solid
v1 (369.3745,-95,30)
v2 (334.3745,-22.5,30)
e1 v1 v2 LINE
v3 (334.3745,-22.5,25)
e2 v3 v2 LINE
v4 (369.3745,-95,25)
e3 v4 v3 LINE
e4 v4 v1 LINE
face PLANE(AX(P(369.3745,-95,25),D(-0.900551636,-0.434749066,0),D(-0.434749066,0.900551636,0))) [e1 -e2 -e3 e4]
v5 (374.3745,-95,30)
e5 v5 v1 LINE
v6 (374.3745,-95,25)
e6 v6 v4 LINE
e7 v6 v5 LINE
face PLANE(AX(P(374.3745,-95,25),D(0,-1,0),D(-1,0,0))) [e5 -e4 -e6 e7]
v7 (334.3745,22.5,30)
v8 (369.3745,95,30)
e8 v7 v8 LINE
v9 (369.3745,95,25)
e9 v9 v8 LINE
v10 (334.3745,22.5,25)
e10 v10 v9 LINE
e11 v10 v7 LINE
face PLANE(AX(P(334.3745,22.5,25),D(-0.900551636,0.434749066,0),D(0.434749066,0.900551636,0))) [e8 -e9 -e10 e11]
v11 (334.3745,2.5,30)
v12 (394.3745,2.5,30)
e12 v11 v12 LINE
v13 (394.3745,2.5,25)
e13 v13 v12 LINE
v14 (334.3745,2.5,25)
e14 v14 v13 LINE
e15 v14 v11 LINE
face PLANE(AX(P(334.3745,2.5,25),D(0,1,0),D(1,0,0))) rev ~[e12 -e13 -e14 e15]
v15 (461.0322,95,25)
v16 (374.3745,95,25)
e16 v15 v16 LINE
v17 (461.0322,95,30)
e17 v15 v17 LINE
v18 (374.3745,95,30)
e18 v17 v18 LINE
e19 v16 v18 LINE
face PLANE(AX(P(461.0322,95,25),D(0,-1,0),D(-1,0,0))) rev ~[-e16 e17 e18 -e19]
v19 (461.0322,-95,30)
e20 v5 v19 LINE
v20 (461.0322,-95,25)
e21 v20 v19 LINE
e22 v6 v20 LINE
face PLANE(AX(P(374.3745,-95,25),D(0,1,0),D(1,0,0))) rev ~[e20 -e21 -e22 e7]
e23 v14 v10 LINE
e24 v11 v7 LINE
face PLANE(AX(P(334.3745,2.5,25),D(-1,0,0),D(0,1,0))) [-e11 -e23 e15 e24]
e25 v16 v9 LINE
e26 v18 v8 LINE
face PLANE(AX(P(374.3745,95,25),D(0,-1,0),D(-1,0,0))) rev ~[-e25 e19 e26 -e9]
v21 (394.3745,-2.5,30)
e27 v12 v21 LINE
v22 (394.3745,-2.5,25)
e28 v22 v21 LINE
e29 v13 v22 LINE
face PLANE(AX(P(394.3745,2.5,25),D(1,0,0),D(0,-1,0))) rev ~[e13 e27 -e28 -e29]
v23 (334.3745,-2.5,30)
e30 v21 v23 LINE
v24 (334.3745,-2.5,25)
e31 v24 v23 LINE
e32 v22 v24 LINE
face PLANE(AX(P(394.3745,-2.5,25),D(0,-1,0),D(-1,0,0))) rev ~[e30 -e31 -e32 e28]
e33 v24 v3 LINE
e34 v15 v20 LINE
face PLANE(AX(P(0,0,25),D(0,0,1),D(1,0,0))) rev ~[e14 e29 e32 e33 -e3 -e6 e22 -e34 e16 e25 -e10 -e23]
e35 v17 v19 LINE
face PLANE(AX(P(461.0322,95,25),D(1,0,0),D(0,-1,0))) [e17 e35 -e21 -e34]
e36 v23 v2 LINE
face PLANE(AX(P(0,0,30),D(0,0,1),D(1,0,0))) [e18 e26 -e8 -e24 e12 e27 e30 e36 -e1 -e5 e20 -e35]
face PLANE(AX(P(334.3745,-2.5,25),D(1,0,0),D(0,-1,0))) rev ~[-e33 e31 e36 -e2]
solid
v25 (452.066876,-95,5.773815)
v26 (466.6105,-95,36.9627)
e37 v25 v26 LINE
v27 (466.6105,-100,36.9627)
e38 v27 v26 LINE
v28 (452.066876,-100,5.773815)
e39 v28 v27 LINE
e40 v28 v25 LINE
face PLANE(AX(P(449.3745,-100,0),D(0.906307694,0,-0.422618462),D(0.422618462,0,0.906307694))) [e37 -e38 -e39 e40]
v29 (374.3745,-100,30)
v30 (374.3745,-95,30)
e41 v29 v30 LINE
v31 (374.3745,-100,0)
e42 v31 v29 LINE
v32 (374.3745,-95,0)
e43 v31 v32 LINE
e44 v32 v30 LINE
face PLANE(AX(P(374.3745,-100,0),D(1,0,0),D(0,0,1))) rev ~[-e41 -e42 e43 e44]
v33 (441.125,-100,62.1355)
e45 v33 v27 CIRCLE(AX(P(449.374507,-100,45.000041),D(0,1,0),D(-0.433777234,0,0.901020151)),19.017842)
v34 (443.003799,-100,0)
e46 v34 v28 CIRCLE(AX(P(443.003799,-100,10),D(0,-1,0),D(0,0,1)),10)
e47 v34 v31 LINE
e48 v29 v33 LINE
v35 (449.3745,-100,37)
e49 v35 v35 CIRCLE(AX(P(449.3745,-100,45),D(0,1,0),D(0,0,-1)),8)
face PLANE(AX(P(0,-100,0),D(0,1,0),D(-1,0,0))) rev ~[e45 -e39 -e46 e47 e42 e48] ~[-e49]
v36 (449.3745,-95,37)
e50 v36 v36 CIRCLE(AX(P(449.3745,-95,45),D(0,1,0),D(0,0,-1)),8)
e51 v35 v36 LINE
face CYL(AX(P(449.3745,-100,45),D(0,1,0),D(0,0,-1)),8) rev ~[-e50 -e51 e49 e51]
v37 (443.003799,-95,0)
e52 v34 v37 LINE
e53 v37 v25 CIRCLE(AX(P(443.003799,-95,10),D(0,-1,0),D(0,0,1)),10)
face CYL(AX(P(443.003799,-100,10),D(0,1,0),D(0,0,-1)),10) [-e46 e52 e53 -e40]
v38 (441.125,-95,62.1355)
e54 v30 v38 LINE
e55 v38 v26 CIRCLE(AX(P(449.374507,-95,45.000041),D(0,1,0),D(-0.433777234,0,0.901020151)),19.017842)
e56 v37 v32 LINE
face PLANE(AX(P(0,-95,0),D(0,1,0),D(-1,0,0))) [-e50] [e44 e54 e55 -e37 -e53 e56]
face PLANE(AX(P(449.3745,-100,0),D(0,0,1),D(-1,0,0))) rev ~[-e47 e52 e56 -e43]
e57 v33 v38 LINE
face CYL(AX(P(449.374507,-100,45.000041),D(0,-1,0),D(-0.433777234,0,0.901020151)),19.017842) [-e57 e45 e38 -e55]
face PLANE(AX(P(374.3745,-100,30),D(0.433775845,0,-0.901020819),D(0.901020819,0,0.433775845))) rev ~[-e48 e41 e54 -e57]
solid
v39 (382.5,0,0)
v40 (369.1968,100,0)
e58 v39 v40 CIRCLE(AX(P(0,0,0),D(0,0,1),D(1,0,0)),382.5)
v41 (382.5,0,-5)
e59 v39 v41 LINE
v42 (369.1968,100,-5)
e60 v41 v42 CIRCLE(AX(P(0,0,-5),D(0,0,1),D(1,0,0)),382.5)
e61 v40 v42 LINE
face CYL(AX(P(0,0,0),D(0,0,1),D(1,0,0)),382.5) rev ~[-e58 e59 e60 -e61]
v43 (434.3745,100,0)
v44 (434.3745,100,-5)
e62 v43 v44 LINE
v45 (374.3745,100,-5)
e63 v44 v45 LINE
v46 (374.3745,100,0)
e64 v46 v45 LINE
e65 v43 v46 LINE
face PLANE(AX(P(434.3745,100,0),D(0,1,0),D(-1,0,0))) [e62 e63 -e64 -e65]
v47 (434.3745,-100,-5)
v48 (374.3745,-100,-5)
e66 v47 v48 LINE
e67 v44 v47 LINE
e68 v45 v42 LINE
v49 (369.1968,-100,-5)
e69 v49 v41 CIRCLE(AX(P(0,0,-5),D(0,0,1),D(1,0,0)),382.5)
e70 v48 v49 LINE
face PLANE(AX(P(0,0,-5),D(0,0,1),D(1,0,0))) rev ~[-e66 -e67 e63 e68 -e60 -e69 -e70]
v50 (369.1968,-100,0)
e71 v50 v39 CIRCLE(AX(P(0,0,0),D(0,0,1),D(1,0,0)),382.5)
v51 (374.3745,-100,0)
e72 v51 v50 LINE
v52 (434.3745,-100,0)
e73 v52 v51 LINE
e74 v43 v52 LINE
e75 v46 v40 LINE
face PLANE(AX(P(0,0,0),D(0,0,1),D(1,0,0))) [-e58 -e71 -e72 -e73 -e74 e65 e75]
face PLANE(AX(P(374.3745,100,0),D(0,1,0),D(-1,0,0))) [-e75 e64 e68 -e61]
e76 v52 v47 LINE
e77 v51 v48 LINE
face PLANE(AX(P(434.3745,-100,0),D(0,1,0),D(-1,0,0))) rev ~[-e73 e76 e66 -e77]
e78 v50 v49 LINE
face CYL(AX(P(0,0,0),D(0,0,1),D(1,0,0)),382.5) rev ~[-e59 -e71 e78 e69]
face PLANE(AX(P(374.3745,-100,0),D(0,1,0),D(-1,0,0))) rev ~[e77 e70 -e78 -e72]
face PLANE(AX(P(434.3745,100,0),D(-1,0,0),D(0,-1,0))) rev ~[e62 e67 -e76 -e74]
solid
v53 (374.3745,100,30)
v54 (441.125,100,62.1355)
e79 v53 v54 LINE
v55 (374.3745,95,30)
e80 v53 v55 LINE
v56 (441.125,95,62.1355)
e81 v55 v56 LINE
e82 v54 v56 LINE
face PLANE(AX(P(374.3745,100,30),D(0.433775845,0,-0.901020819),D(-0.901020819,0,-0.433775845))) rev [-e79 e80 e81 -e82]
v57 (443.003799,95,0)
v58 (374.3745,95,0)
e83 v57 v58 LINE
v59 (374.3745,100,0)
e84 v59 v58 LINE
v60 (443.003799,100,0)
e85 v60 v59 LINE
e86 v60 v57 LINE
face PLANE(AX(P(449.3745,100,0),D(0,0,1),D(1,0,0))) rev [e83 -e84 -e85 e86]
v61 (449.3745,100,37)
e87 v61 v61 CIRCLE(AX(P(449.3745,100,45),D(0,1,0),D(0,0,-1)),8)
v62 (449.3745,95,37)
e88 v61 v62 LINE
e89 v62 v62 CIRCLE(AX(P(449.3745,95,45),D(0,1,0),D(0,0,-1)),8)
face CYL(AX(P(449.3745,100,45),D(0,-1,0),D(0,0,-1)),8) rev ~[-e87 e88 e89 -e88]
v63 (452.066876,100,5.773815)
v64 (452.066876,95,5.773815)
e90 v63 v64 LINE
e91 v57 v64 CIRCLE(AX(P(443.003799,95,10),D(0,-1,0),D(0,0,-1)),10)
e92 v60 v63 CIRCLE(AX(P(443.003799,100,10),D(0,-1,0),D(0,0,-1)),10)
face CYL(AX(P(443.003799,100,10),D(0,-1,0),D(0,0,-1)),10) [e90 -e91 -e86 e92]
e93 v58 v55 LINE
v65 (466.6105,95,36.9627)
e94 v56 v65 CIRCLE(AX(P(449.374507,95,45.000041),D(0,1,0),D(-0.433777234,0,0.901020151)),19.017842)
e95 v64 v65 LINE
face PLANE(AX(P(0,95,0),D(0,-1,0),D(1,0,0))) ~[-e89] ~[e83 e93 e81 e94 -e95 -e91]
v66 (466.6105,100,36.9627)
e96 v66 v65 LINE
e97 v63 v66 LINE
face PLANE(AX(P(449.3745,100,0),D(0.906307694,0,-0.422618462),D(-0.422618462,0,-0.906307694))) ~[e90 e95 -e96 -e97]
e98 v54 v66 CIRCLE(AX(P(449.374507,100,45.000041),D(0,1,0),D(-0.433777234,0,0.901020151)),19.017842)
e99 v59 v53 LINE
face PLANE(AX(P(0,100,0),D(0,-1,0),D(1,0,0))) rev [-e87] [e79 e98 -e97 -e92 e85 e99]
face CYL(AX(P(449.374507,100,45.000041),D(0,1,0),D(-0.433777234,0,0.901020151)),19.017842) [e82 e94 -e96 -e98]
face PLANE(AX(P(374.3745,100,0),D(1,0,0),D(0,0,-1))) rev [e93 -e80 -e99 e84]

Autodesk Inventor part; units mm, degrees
ref_plane "YZ Plane" through (0, 0, 0) normal (1, 0, 0) x (0, 1, 0)
ref_plane "Work Plane1" through (0, 0, 25) normal (0, 0, 1) x (1, 0, 0)
ref_plane "Work Plane2" through (0, -100, 0) normal (0, 1, 0) x (-1, 0, 0)
sketch "LayoutSK" plane through (0, 0, 25) normal (0, 0, 1) x (1, 0, 0)
  circle A0 centre (0, 0) radius 387.5 construction
  line L0 (0, 0) -> (387.5, 0) construction
  line L1 (374.3745, 100) -> (374.3745, -100) construction
  circle A1 centre (0, 0) radius 382.5
  dimension "dia" = 775
  dimension "d17" = 200
  dimension "d28" = 5
sketch "Sketch1" plane through (0, -100, 0) normal (0, 1, 0) x (-1, 0, 0)
  line L0 (-374.3745, 0) -> (-374.3745, 30)
  line L1 (-374.3745, 30) -> (-441.125, 62.1355)
  line L2 (-449.3745, 0) -> (-374.3745, 0)
  line L3 (-449.3745, 0) -> (-466.6105, 36.9627)
  arc A0 (-441.125, 62.1355) -> (-466.6105, 36.9627) centre (-449.3745, 45) ccw
  point P0 (0, 0)
  point P1 (-374.3745, 25)
  point P2 (-374.3745, 25)
  point P3 (-374.3745, 25)
  dimension "d0" = 30
  dimension "d2" = 75
  dimension "d13" = 45
  dimension "d14" = 75
  dimension "d15" = 115
extrude "Plate1" add sketch "Sketch1" along normal blind 5
sketch "Sketch2" plane through (0, -100, 0) normal (0, -1, 0) x (1, 0, 0)
  arc A0 (466.6105, 36.9627) -> (441.125, 62.1355) centre (449.3745, 45) ccw projected
  point P0 (0, 0)
hole "Hole1" at (449.3745, -100, 45) direction (0, 1, 0) diameter 16 end through all
mirror "Mirror1" about plane through (0, 0, 0) normal (0, 1, 0)
sketch "Sketch4" plane through (0, 0, 25) normal (0, 0, 1) x (1, 0, 0)
  line L0 (374.3745, -95) -> (461.0322, -95)
  line L1 (461.0322, -95) -> (461.0322, -100)
  line L2 (461.0322, -100) -> (374.3745, -100)
  line L3 (374.3745, 100) -> (461.0322, 100)
  line L4 (461.0322, 100) -> (461.0322, 95)
  line L5 (461.0322, 95) -> (374.3745, 95)
  line L6 (334.3745, 2.5) -> (394.3745, 2.5)
  line L7 (394.3745, 2.5) -> (394.3745, -2.5)
  line L8 (394.3745, -2.5) -> (334.3745, -2.5)
  line L9 (461.0322, 95) -> (461.0322, -95)
  line L10 (334.3745, 2.5) -> (334.3745, 22.5)
  line L11 (334.3745, -2.5) -> (334.3745, -22.5)
  line L12 (374.3745, -100) -> (374.3745, -95)
  line L13 (374.3745, 95) -> (374.3745, 100)
  line L14 (374.3745, 95) -> (369.3745, 95)
  line L15 (374.3745, -95) -> (369.3745, -95)
  line L16 (369.3745, -95) -> (334.3745, -22.5)
  line L17 (334.3745, 22.5) -> (369.3745, 95)
  point P0 (0, 0)
  point P1 (394.3745, 0)
  point P2 (461.0322, 0)
  dimension "d20" = 5
  dimension "d21" = 20
  dimension "d23" = 60
  dimension "d26" = 5
  dimension "d27" = 40
extrude "Plate2" add sketch "Sketch4" along normal blind 5 separate body contours L15 L16 L11 L8 L7 L6 L10 L17 L14 L5 L9 L0
sketch "Sketch5" plane through (0, 0, 0) normal (0, 0, 1) x (1, 0, 0)
  line L0 (449.3745, -100) -> (374.3745, -100)
  line L1 (449.3745, 100) -> (374.3745, 100)
  circle A0 centre (0, 0) radius 382.5
  line L2 (449.3745, -100) -> (449.3745, 100)
  line L3 (449.3745, 100) -> (369.1968, 100)
  line L4 (449.3745, -100) -> (369.1968, -100)
  line L5 (434.3745, 100) -> (434.3745, -100)
  point P0 (443.0038, 100)
  dimension "d30" = 15
extrude "Plate3" add sketch "Sketch5" against normal blind 5 separate body contours L0 L4 A0 L3 L1 L5
fillet "Corner Round1" radius 10 2 edges at (449.3745, -97.5, 0) (449.3745, 97.5, 0)
equation "\"d2\" = d14"
equation "\"d11\" = Thickness"
equation "\"d5\" = Thickness"
equation "\"d24\" = Thickness"
equation "\"d29\" = Thickness"
equation "\"BendRadius\" = Thickness"
equation "\"BendReliefWidth\" = Thickness"
equation "\"BendReliefDepth\" = 0.5 * Thickness"
equation "\"TransitionRadius\" = BendRadius"
equation "\"JacobiRadiusSize\" = BendRadius"
equation "\"GapSize\" = Thickness"
equation "\"Thickness\" = 5"
properties part number "PWTR-0135" material "Steel, High Strength, Low Alloy"
